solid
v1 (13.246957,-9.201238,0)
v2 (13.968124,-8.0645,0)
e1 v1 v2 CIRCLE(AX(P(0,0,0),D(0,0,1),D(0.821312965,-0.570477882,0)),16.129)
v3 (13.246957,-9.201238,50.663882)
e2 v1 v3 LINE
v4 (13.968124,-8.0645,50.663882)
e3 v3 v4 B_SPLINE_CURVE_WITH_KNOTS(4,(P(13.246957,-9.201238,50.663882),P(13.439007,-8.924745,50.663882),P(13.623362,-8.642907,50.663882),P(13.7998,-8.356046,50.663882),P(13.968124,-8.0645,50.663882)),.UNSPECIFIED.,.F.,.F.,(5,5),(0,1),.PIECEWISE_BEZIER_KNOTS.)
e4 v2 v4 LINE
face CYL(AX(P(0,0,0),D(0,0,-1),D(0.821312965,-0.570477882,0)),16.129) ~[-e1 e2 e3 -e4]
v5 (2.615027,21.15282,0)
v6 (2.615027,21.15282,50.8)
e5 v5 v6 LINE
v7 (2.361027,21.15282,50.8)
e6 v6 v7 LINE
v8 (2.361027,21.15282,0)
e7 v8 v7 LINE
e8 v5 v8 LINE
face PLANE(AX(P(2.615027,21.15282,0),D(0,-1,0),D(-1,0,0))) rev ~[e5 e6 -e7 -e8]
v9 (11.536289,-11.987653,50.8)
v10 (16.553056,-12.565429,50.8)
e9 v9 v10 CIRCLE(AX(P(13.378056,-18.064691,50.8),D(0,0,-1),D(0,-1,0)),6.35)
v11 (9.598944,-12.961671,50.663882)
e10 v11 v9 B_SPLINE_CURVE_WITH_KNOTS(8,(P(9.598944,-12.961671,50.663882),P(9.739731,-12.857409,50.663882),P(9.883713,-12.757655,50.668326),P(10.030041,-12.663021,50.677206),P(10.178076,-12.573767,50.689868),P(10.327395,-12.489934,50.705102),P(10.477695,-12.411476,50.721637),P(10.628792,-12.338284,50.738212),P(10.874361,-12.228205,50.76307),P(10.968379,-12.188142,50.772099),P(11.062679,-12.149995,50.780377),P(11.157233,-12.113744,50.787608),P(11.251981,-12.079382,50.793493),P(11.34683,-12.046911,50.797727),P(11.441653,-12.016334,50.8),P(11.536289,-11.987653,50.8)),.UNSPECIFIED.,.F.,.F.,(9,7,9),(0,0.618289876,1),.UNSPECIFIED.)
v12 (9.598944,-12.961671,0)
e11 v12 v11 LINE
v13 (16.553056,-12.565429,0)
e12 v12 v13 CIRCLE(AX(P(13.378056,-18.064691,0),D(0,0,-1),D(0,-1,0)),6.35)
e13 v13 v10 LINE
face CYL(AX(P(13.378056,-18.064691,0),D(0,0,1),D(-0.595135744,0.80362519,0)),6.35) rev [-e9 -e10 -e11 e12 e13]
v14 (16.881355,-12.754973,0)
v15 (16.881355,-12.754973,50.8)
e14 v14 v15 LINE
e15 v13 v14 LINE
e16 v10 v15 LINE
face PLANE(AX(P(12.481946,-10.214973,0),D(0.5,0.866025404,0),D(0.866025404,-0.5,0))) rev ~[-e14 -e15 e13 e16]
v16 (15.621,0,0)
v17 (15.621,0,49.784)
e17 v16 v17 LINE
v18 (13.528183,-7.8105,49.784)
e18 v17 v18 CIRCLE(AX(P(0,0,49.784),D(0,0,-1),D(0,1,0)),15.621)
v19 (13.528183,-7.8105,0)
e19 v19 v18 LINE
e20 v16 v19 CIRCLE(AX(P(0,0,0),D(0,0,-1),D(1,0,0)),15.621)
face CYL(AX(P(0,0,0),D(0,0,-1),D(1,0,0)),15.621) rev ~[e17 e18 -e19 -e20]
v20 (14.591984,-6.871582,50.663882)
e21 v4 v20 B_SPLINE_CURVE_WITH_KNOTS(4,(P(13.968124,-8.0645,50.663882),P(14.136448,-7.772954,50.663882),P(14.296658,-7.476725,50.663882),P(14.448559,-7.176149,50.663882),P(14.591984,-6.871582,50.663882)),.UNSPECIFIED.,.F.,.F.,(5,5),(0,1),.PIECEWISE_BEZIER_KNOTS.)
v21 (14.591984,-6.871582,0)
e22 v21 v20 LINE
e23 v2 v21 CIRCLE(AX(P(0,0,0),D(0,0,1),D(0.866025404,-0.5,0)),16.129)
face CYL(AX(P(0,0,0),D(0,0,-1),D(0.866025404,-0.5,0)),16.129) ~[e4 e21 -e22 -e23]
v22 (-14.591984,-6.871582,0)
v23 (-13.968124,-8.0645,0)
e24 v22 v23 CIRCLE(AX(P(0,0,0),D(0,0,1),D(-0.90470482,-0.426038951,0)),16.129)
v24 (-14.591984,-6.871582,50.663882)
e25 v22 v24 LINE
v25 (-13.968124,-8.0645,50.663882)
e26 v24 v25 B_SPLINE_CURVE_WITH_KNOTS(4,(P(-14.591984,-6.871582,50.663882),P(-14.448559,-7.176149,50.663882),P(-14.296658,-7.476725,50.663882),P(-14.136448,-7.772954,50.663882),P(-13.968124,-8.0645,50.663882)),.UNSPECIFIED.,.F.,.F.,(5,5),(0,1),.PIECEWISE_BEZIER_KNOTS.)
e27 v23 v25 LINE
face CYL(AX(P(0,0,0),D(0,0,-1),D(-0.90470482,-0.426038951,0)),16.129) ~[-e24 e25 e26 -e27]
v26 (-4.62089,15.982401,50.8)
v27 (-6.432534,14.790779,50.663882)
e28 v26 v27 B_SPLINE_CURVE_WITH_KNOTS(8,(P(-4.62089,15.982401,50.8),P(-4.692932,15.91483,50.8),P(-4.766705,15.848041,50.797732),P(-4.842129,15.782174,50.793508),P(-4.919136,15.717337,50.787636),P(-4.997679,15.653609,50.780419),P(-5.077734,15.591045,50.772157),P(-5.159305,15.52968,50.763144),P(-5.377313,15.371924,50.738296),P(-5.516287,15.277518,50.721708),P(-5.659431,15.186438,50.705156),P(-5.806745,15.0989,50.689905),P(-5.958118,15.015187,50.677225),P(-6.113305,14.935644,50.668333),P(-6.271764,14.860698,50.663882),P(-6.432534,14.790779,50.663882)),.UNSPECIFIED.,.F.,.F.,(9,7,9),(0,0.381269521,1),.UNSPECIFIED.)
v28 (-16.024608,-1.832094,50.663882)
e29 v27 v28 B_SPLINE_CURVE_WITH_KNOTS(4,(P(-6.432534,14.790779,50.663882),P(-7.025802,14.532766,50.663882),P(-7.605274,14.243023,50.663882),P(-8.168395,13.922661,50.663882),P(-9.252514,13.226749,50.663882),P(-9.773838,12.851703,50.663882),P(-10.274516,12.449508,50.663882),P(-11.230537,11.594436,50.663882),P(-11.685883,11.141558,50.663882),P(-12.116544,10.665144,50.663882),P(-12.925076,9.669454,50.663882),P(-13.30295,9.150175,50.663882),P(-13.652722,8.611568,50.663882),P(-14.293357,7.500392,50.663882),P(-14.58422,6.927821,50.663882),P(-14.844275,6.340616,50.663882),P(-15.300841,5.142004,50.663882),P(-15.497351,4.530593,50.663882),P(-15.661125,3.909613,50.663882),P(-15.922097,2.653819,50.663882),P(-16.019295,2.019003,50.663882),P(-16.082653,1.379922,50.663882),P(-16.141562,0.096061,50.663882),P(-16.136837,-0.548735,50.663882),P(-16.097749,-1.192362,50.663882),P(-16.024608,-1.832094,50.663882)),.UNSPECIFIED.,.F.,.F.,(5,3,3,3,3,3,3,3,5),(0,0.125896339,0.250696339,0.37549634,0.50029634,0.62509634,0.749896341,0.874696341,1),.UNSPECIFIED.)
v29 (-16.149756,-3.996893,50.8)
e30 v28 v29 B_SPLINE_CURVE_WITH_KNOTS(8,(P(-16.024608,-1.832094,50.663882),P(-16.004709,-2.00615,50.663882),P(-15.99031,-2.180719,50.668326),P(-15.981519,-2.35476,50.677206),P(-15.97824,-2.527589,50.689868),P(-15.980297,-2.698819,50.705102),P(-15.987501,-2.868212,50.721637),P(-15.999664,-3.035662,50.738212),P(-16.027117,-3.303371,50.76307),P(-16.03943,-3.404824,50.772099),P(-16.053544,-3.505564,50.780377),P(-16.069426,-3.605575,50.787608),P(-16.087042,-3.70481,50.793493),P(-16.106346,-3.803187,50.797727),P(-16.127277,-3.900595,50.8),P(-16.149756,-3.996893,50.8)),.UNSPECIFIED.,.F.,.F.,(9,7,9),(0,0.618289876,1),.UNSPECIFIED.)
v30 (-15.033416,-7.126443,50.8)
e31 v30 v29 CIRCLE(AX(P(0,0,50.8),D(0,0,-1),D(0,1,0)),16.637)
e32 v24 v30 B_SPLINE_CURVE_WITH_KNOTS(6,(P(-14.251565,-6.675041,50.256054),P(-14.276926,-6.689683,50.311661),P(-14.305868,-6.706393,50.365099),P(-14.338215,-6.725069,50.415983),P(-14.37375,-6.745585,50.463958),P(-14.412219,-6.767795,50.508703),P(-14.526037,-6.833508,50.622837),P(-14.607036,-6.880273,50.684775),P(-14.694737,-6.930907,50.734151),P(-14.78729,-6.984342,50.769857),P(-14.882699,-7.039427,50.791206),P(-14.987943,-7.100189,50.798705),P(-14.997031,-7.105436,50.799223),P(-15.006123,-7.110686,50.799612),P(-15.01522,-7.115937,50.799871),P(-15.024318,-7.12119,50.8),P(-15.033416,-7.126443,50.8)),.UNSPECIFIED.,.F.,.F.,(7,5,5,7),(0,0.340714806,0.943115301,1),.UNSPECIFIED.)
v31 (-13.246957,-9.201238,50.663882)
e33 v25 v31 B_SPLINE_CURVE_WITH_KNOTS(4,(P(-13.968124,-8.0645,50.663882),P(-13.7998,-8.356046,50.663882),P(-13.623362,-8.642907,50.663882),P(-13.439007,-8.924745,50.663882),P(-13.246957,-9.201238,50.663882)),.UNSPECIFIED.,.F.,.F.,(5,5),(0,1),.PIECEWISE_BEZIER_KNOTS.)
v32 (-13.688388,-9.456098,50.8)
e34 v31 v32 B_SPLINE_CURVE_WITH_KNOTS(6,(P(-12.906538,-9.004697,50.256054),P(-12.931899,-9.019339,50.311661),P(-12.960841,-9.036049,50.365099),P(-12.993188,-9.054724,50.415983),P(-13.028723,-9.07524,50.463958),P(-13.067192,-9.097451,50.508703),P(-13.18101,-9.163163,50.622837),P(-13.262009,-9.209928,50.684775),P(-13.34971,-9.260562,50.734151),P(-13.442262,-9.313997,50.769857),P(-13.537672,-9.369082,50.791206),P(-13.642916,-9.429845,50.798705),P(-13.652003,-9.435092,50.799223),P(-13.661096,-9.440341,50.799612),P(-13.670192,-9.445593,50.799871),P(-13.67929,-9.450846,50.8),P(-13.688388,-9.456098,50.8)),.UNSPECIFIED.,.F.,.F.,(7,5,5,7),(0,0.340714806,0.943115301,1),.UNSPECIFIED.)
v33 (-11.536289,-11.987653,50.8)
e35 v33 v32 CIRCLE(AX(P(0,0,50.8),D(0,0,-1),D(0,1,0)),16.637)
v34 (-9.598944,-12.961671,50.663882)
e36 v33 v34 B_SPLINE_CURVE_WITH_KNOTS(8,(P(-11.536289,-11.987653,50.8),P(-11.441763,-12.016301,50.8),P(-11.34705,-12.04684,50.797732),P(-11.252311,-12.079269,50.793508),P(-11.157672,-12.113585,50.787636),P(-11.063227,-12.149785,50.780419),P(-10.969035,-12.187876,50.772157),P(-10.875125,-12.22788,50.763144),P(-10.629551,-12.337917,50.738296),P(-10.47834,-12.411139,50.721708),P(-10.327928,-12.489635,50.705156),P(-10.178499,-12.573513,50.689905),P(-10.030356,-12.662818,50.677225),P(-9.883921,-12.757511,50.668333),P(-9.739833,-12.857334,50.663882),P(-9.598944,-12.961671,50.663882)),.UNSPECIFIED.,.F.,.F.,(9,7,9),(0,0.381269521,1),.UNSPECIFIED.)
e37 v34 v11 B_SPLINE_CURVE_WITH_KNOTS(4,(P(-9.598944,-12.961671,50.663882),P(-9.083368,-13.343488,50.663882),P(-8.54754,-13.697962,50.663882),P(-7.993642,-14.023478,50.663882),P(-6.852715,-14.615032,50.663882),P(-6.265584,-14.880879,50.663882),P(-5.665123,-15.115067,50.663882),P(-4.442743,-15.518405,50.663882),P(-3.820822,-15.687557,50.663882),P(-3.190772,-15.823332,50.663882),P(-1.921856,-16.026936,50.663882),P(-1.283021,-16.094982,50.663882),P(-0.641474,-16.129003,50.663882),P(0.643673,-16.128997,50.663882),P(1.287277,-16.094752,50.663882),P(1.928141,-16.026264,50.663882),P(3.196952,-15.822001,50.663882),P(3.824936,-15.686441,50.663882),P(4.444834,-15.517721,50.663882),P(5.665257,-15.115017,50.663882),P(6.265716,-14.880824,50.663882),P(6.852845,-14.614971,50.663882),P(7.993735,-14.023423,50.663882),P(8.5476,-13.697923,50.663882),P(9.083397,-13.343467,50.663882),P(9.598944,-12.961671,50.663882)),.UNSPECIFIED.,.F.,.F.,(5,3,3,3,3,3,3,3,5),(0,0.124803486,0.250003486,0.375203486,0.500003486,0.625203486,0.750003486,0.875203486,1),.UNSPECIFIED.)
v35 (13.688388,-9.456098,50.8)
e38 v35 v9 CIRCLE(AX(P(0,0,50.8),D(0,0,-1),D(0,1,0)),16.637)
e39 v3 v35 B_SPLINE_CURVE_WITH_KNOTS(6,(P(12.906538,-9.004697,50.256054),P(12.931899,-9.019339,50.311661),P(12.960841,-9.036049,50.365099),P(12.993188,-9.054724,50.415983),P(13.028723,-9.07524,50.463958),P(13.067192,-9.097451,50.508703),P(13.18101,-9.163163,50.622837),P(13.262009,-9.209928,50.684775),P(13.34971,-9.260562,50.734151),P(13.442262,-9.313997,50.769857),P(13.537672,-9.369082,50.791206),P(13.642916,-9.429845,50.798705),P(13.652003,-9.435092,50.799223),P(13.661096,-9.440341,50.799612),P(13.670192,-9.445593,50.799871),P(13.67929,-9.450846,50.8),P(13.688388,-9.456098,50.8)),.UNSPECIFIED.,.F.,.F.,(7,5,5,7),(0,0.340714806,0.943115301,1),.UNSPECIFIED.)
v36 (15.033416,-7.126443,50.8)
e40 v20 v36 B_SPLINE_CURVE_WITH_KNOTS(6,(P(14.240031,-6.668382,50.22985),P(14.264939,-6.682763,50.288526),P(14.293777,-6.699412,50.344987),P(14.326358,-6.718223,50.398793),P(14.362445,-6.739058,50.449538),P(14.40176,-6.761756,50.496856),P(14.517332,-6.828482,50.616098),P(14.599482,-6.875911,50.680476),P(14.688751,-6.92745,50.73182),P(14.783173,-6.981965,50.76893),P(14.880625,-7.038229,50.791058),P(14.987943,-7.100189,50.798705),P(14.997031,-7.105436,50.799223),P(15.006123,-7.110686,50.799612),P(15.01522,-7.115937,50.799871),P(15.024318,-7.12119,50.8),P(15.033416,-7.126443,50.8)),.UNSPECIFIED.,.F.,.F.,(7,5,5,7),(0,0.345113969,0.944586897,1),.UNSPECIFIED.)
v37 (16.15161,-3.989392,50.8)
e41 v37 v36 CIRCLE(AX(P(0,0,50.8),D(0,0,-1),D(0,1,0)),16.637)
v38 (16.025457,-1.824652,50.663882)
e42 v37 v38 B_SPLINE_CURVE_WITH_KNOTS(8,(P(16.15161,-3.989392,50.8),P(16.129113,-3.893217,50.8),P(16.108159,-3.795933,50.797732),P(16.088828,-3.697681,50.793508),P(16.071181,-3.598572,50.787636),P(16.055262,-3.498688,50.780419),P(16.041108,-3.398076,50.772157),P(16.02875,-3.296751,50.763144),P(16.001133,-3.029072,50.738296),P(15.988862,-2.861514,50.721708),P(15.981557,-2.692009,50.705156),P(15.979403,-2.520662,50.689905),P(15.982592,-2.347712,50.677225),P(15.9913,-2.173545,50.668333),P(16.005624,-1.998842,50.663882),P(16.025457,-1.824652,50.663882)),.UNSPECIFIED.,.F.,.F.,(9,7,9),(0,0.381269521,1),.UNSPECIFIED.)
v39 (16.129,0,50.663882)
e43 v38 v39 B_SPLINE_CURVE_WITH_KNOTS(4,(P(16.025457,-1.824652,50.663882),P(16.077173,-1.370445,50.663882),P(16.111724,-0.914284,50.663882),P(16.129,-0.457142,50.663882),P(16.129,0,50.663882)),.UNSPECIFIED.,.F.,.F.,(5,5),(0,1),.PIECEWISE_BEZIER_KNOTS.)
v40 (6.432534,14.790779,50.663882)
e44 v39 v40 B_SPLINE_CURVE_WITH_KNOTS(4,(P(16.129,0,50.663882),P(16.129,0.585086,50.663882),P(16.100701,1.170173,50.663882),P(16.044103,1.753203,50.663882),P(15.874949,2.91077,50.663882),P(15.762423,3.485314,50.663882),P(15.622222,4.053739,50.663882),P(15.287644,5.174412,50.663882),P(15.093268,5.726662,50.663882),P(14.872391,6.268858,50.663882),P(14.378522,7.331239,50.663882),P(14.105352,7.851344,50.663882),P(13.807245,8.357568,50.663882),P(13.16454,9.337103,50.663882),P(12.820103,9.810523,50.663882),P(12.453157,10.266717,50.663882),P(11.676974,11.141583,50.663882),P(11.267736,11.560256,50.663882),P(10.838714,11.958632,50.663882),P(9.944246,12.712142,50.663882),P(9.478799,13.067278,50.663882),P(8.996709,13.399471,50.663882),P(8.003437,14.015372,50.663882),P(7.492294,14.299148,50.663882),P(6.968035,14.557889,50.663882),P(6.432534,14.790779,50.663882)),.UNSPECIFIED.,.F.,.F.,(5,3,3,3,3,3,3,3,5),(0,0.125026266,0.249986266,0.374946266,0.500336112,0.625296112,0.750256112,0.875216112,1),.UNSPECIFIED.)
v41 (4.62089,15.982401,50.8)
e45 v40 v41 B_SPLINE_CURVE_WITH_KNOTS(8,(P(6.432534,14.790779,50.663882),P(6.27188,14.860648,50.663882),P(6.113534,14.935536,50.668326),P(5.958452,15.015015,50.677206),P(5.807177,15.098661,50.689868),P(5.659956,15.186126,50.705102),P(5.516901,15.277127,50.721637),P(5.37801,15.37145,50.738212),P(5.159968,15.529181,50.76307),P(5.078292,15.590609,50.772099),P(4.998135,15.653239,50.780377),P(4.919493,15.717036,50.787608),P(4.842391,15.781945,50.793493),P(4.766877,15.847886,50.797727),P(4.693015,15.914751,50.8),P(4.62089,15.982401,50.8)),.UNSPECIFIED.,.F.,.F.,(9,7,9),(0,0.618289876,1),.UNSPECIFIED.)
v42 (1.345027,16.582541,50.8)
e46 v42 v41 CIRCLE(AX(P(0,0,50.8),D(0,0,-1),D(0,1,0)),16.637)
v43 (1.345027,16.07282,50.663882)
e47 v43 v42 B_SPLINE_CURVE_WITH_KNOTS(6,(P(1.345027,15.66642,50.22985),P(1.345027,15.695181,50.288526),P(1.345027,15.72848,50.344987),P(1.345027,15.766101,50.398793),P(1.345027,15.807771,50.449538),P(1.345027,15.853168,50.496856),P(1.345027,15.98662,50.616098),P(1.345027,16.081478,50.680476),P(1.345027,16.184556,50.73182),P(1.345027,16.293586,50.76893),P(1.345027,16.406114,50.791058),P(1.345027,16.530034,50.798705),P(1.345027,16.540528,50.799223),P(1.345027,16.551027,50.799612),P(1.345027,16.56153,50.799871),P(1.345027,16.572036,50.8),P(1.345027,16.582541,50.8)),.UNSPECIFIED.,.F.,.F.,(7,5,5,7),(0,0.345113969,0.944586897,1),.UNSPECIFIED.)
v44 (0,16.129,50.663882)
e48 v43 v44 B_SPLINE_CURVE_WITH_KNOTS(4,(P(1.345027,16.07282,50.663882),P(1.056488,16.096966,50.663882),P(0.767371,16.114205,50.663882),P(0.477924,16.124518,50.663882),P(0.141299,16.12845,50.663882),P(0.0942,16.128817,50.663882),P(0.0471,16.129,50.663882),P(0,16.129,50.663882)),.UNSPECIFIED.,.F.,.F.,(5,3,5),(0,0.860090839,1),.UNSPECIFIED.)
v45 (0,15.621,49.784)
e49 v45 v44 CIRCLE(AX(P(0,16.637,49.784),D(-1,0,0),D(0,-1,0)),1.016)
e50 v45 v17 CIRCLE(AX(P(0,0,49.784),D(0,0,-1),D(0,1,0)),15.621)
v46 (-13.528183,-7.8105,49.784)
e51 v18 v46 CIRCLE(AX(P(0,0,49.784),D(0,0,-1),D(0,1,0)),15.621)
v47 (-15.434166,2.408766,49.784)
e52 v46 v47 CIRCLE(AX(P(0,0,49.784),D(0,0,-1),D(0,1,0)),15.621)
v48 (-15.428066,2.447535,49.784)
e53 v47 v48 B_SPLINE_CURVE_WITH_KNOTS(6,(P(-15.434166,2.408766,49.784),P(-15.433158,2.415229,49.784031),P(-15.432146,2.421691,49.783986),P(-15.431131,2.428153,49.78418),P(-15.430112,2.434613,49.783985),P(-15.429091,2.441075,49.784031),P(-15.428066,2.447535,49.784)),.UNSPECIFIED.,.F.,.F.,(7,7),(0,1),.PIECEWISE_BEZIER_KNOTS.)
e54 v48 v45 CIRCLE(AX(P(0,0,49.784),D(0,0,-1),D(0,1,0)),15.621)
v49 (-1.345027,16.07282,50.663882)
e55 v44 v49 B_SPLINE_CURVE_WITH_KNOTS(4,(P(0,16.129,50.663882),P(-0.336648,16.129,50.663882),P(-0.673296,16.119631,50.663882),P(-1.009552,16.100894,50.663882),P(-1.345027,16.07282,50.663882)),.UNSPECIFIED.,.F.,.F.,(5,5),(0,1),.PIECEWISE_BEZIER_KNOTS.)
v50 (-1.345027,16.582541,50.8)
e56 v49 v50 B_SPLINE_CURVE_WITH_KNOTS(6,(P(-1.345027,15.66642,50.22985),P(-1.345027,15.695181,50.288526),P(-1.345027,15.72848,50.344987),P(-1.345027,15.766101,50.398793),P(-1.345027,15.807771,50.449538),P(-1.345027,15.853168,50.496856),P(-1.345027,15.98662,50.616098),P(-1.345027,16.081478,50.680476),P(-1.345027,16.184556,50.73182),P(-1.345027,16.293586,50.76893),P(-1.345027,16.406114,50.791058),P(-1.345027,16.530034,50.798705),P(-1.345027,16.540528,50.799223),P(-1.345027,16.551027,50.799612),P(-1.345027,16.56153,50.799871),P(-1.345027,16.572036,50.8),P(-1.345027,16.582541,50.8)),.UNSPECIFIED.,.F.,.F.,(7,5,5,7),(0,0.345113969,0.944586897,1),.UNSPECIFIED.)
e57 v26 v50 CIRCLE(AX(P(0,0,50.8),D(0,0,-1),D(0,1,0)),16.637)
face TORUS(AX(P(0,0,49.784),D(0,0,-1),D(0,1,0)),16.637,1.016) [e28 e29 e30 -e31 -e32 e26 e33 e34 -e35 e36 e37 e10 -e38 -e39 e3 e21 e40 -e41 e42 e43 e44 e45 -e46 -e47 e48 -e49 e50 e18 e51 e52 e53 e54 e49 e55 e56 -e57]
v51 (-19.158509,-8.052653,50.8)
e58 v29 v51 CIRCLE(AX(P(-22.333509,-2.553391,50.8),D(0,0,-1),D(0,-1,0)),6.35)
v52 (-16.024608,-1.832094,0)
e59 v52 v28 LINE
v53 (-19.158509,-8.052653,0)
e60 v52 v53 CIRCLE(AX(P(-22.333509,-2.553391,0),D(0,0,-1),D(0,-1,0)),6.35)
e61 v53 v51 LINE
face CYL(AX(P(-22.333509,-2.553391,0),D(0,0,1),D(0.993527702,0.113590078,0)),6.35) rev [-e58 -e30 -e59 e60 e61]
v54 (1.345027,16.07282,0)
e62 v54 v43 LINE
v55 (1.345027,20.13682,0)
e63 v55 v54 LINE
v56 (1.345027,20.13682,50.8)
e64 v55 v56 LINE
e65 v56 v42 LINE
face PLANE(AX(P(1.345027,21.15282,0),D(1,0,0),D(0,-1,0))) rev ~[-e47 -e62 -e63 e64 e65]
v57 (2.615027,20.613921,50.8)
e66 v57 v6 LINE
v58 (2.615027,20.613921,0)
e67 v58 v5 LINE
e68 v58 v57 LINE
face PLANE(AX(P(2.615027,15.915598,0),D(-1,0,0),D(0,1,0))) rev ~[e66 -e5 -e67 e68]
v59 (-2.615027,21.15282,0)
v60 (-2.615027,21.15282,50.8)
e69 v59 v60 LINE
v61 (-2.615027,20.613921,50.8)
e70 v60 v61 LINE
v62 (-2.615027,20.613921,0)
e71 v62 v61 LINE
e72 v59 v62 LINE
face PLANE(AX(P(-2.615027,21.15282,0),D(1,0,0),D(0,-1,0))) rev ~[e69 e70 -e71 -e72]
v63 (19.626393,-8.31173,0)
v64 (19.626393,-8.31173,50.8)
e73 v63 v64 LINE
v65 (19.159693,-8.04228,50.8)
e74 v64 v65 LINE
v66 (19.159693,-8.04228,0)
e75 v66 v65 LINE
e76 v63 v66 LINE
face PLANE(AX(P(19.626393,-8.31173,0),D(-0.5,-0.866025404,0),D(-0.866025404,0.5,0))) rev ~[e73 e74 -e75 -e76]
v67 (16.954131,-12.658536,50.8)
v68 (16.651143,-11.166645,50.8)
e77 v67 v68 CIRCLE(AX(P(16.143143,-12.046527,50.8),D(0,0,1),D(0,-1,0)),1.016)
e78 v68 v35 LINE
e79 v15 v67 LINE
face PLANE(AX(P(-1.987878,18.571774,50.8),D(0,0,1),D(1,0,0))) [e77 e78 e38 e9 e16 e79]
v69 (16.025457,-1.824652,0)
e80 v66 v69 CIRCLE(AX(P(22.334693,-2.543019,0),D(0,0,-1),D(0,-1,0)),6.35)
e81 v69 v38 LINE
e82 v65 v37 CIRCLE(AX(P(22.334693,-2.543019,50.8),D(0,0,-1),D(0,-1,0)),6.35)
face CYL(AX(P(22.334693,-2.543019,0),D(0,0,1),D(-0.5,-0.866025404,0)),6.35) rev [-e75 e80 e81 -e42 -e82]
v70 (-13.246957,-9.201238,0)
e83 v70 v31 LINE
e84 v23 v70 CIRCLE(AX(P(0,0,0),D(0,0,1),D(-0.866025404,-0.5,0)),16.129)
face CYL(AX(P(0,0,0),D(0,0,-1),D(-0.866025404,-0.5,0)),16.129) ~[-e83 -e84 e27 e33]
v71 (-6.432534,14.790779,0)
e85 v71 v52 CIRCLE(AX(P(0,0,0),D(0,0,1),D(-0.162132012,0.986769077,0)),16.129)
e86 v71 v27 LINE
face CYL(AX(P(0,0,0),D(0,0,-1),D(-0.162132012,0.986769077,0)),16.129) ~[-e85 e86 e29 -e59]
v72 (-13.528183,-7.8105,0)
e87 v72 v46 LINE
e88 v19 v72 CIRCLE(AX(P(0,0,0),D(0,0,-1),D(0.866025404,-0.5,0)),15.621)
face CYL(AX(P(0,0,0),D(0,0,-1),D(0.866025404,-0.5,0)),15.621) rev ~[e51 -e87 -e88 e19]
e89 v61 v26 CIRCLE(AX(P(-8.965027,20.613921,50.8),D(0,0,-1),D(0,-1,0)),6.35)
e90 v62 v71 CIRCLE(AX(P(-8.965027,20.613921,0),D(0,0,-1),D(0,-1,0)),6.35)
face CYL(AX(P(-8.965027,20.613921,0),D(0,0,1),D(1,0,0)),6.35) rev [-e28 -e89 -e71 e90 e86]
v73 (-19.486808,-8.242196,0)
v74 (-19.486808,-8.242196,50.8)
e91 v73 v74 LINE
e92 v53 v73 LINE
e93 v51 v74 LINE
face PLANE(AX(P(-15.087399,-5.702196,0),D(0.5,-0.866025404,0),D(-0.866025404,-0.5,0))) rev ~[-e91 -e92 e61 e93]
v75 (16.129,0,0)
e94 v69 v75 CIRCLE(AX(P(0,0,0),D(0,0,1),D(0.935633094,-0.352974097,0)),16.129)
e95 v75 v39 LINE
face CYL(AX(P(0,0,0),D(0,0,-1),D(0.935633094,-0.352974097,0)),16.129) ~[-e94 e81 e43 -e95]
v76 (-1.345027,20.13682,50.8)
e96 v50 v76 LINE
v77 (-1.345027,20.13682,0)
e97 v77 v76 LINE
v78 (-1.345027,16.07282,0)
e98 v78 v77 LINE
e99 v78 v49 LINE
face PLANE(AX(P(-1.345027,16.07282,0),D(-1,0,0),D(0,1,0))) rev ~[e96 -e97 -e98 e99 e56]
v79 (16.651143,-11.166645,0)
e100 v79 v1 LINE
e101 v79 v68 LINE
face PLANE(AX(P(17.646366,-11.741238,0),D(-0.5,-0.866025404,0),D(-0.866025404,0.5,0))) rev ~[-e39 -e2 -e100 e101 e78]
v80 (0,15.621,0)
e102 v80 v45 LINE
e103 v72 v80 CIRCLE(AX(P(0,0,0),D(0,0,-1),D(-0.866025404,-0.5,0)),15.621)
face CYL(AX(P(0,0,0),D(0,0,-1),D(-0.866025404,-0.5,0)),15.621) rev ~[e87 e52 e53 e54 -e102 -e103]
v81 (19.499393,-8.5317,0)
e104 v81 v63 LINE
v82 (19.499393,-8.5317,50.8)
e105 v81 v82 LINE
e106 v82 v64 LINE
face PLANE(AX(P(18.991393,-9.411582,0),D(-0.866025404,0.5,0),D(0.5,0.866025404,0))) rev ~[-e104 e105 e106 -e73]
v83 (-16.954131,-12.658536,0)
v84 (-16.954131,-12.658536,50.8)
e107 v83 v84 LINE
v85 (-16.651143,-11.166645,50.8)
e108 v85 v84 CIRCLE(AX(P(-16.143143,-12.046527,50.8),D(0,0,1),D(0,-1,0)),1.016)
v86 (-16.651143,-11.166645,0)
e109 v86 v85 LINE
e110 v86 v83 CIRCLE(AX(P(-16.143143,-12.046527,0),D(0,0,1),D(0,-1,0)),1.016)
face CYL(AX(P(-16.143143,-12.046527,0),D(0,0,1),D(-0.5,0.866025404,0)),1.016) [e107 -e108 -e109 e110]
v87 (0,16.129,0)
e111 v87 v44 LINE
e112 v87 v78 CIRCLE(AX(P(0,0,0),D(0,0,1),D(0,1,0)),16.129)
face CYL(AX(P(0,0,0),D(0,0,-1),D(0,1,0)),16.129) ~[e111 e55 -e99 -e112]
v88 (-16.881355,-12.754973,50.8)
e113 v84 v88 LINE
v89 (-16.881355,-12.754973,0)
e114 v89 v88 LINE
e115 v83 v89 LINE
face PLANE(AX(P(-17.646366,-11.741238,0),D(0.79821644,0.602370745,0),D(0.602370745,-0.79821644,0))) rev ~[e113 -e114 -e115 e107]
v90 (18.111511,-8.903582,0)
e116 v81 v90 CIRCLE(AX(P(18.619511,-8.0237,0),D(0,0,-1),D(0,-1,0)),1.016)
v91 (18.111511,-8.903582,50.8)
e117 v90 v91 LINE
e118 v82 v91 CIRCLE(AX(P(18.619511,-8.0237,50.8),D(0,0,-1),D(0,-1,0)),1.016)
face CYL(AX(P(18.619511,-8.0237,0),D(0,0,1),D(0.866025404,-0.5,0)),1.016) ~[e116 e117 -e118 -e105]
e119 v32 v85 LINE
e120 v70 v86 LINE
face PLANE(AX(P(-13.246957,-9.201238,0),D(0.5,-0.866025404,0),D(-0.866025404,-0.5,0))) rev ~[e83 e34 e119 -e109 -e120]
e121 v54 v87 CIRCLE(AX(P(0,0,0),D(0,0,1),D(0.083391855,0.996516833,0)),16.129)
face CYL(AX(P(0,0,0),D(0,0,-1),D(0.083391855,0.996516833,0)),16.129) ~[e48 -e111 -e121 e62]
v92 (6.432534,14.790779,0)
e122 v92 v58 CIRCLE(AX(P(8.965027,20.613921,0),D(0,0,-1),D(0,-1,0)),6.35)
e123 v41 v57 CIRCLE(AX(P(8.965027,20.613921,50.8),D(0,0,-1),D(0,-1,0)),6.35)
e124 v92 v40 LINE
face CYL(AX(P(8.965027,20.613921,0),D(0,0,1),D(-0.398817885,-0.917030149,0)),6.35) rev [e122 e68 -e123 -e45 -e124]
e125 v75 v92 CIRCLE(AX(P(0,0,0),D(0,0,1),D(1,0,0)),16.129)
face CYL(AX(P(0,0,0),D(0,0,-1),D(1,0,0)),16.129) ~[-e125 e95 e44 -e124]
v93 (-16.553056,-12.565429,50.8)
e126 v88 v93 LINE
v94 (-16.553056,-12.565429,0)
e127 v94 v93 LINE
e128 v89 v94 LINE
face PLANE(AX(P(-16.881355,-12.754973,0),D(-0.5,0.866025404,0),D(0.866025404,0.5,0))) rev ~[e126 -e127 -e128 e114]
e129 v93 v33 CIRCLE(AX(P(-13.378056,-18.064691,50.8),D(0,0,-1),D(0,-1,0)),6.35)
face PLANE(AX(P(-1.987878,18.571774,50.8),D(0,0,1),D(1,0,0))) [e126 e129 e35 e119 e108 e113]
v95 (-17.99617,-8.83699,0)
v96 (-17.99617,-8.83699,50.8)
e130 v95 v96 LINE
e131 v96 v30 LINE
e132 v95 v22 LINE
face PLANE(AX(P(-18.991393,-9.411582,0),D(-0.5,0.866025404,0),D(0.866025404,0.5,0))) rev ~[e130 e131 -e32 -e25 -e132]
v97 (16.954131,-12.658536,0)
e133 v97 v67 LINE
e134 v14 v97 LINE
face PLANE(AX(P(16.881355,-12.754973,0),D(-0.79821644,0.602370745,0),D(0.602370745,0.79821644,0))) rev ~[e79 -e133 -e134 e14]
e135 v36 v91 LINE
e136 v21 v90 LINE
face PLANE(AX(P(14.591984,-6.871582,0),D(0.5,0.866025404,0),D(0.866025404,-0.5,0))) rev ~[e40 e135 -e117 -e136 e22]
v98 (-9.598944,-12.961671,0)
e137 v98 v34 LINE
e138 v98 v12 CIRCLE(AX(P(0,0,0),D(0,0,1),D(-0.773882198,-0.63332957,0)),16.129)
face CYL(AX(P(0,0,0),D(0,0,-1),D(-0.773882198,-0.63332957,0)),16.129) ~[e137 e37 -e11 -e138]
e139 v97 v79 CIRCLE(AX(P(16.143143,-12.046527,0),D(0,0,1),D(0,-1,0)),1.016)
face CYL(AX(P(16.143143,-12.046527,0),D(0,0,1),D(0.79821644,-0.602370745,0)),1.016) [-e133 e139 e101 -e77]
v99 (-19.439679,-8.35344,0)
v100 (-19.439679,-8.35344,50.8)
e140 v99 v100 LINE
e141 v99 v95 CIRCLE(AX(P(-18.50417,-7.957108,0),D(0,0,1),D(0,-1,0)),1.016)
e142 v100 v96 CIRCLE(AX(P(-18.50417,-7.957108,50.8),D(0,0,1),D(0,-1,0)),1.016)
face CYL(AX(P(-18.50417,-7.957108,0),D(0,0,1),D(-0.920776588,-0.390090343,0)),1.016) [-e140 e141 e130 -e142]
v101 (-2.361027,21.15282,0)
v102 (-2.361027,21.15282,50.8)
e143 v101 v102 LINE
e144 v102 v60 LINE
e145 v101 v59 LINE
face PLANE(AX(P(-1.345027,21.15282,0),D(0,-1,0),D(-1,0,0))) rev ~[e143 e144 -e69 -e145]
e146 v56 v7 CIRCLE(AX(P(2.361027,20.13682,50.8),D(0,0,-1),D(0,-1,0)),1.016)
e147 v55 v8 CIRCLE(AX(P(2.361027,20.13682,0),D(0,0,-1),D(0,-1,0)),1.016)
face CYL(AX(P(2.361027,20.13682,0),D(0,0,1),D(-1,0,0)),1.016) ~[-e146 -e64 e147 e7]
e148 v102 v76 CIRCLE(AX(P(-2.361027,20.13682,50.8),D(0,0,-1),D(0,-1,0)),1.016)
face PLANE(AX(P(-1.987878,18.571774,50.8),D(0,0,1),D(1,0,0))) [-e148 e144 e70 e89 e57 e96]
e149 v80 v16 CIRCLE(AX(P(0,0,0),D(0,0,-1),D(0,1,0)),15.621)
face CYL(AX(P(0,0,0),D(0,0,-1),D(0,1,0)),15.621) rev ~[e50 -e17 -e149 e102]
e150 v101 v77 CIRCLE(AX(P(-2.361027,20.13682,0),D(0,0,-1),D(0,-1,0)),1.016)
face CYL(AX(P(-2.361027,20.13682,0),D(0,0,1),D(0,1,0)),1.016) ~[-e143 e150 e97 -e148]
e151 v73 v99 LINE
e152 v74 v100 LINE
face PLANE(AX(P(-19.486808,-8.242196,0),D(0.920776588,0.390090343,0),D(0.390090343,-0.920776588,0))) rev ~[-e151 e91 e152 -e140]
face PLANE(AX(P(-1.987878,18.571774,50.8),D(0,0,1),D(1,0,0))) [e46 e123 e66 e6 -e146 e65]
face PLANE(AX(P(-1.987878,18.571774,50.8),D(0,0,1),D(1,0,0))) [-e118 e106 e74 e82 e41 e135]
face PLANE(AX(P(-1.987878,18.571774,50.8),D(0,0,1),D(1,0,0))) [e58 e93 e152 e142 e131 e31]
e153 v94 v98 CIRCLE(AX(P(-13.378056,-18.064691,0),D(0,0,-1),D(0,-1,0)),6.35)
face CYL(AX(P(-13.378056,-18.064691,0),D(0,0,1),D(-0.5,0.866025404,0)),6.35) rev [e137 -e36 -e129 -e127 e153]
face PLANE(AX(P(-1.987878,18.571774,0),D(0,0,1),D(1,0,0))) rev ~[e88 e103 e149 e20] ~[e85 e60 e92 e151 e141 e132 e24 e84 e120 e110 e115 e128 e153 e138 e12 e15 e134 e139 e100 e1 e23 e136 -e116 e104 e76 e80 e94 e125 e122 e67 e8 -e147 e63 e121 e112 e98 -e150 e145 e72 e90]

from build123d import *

# Parameters (mm, degrees)
F1_DEPTH = 50.8
F2_R     = 6.35
F3_R     = 1.016


# Not quite as in the source:
# - a fillet or chamfer that OpenCascade refuses, or shapes differently, is made with other operations: its cross-section is extruded or revolved along the edge and cut away or added


with BuildPart() as f1:
    # F0 (on Top) → F1 (new body)
    with BuildSketch(Plane.XY):
        with BuildLine():
            ThreePointArc((-2.6150272293, 15.9155984364), (-1.9815871124, 16.0068095983), (-1.3450272293, 16.07282))
            Line((-1.3450272293, 16.07282), (-1.3450272293, 21.15282))
            Line((-1.3450272293, 21.15282), (-2.6150272293, 21.15282))
            Line((-2.6150272293, 21.15282), (-2.6150272293, 15.9155984364))
        make_face()
        with BuildLine():
            Line((1.3450272293, 21.15282), (1.3450272293, 16.07282))
            ThreePointArc((1.3450272293, 16.07282), (1.9815871124, 16.0068095983), (2.6150272293, 15.9155984364))
            Line((2.6150272293, 15.9155984364), (2.6150272293, 21.15282))
            Line((2.6150272293, 21.15282), (1.3450272293, 21.15282))
        make_face()
        with BuildLine():
            ThreePointArc((0, 15.621), (11.0457150289, 11.0457150289), (15.621, 0))
            ThreePointArc((15.621, 0), (15.0887273325, -4.0430123035), (13.5281828325, -7.8105))
            Line((13.5281828325, -7.8105), (13.9681237376, -8.0645))
            ThreePointArc((13.9681237376, -8.0645), (14.2925051104, -7.4745527405), (14.5919840451, -6.8715822506))
            ThreePointArc((14.5919840451, -6.8715822506), (14.8530973018, -6.28730002), (15.090826177, -5.693119206))
            ThreePointArc((15.090826177, -5.693119206), (15.867333998, -2.8935018222), (16.129, 0))
            ThreePointArc((16.129, 0), (12.2947634215, 10.439513083), (2.6150272293, 15.9155984364))
            ThreePointArc((2.6150272293, 15.9155984364), (1.9815871124, 16.0068095983), (1.3450272293, 16.07282))
            ThreePointArc((1.3450272293, 16.07282), (0.6731, 16.1149488795), (0, 16.129))
            Line((0, 16.129), (0, 15.621))
        make_face()
        with BuildLine():
            ThreePointArc((15.090826177, -5.693119206), (14.8530973018, -6.28730002), (14.5919840451, -6.8715822506))
            Line((14.5919840451, -6.8715822506), (18.9913930963, -9.4115822506))
            Line((18.9913930963, -9.4115822506), (19.6263930963, -8.3117299878))
            Line((19.6263930963, -8.3117299878), (15.090826177, -5.693119206))
        make_face()
        with BuildLine():
            Line((17.646365867, -11.7412377494), (13.2469568158, -9.2012377494))
            ThreePointArc((13.2469568158, -9.2012377494), (12.8744329677, -9.7156377434), (12.4819459699, -10.2149726287))
            Line((12.4819459699, -10.2149726287), (16.8813550211, -12.7549726287))
            Line((16.8813550211, -12.7549726287), (17.646365867, -11.7412377494))
        make_face()
        with BuildLine():
            Line((13.9681237376, -8.0645), (13.5281828325, -7.8105))
            ThreePointArc((13.5281828325, -7.8105), (0, -15.621), (-13.5281828325, -7.8105))
            Line((-13.5281828325, -7.8105), (-13.9681237376, -8.0645))
            ThreePointArc((-13.9681237376, -8.0645), (-13.6194051104, -8.6403961391), (-13.2469568158, -9.2012377494))
            ThreePointArc((-13.2469568158, -9.2012377494), (-12.8744329677, -9.7156377434), (-12.4819459699, -10.2149726287))
            ThreePointArc((-12.4819459699, -10.2149726287), (0, -16.129), (12.4819459699, -10.2149726287))
            ThreePointArc((12.4819459699, -10.2149726287), (12.8744329677, -9.7156377434), (13.2469568158, -9.2012377494))
            ThreePointArc((13.2469568158, -9.2012377494), (13.6194051104, -8.6403961391), (13.9681237376, -8.0645))
        make_face()
        with BuildLine():
            ThreePointArc((-12.4819459699, -10.2149726287), (-12.8744329677, -9.7156377434), (-13.2469568158, -9.2012377494))
            Line((-13.2469568158, -9.2012377494), (-17.646365867, -11.7412377494))
            Line((-17.646365867, -11.7412377494), (-16.8813550211, -12.7549726287))
            Line((-16.8813550211, -12.7549726287), (-12.4819459699, -10.2149726287))
        make_face()
        with BuildLine():
            ThreePointArc((-13.5281828325, -7.8105), (-13.5281828325, 7.8105), (0, 15.621))
            Line((0, 15.621), (0, 16.129))
            ThreePointArc((0, 16.129), (-0.6731, 16.1149488795), (-1.3450272293, 16.07282))
            ThreePointArc((-1.3450272293, 16.07282), (-1.9815871124, 16.0068095983), (-2.6150272293, 15.9155984364))
            ThreePointArc((-2.6150272293, 15.9155984364), (-13.970548685, 8.0602984088), (-15.0873987804, -5.7021959842))
            ThreePointArc((-15.0873987804, -5.7021959842), (-14.8512055836, -6.2917671377), (-14.5919840451, -6.8715822506))
            ThreePointArc((-14.5919840451, -6.8715822506), (-14.2925051104, -7.4745527405), (-13.9681237376, -8.0645))
            Line((-13.9681237376, -8.0645), (-13.5281828325, -7.8105))
        make_face()
        with BuildLine():
            Line((-18.9913930963, -9.4115822506), (-14.5919840451, -6.8715822506))
            ThreePointArc((-14.5919840451, -6.8715822506), (-14.8512055836, -6.2917671377), (-15.0873987804, -5.7021959842))
            Line((-15.0873987804, -5.7021959842), (-19.4868078316, -8.2421959842))
            Line((-19.4868078316, -8.2421959842), (-18.9913930963, -9.4115822506))
        make_face()
    extrude(amount=F1_DEPTH)

    # F2
    f2_edges = [f1.edges().sort_by_distance(p)[0] for p in [
        (2.615027, 15.915598, 25.4),
        (15.090826, -5.693119, 25.4),
        (12.481946, -10.214973, 25.4),
        (-12.481946, -10.214973, 25.4),
        (-15.087399, -5.702196, 25.4),
        (-2.615027, 15.915598, 25.4),
    ]]
    fillet(f2_edges, radius=F2_R)

    # F3
    f3_edges = [f1.edges().sort_by_distance(p)[0] for p in [
        (1.345027, 21.15282, 25.4),
        (-1.345027, 21.15282, 25.4),
        (-18.991393, -9.411582, 25.4),
        (-17.646366, -11.741238, 25.4),
        (17.646366, -11.741238, 25.4),
        (18.991393, -9.411582, 25.4),
    ]]
    fillet(f3_edges, radius=F3_R)

    # F4: fillet of radius 1.016 on 1 edges, made by hand

    # F4_s1 → F4_t2 (revolve, cut)
    with BuildSketch(Plane.YZ):
        with BuildLine():
            ThreePointArc((15.621, 49.784), (15.9185795103, 50.5024204897), (16.637, 50.8))
            Line((16.637, 50.8), (15.621, 50.8))
            Line((15.621, 50.8), (15.621, 49.784))
        make_face()
    revolve(axis=Axis((0, 0, 50.8), (0, 0, -1)), mode=Mode.SUBTRACT)


solid = f1.part
